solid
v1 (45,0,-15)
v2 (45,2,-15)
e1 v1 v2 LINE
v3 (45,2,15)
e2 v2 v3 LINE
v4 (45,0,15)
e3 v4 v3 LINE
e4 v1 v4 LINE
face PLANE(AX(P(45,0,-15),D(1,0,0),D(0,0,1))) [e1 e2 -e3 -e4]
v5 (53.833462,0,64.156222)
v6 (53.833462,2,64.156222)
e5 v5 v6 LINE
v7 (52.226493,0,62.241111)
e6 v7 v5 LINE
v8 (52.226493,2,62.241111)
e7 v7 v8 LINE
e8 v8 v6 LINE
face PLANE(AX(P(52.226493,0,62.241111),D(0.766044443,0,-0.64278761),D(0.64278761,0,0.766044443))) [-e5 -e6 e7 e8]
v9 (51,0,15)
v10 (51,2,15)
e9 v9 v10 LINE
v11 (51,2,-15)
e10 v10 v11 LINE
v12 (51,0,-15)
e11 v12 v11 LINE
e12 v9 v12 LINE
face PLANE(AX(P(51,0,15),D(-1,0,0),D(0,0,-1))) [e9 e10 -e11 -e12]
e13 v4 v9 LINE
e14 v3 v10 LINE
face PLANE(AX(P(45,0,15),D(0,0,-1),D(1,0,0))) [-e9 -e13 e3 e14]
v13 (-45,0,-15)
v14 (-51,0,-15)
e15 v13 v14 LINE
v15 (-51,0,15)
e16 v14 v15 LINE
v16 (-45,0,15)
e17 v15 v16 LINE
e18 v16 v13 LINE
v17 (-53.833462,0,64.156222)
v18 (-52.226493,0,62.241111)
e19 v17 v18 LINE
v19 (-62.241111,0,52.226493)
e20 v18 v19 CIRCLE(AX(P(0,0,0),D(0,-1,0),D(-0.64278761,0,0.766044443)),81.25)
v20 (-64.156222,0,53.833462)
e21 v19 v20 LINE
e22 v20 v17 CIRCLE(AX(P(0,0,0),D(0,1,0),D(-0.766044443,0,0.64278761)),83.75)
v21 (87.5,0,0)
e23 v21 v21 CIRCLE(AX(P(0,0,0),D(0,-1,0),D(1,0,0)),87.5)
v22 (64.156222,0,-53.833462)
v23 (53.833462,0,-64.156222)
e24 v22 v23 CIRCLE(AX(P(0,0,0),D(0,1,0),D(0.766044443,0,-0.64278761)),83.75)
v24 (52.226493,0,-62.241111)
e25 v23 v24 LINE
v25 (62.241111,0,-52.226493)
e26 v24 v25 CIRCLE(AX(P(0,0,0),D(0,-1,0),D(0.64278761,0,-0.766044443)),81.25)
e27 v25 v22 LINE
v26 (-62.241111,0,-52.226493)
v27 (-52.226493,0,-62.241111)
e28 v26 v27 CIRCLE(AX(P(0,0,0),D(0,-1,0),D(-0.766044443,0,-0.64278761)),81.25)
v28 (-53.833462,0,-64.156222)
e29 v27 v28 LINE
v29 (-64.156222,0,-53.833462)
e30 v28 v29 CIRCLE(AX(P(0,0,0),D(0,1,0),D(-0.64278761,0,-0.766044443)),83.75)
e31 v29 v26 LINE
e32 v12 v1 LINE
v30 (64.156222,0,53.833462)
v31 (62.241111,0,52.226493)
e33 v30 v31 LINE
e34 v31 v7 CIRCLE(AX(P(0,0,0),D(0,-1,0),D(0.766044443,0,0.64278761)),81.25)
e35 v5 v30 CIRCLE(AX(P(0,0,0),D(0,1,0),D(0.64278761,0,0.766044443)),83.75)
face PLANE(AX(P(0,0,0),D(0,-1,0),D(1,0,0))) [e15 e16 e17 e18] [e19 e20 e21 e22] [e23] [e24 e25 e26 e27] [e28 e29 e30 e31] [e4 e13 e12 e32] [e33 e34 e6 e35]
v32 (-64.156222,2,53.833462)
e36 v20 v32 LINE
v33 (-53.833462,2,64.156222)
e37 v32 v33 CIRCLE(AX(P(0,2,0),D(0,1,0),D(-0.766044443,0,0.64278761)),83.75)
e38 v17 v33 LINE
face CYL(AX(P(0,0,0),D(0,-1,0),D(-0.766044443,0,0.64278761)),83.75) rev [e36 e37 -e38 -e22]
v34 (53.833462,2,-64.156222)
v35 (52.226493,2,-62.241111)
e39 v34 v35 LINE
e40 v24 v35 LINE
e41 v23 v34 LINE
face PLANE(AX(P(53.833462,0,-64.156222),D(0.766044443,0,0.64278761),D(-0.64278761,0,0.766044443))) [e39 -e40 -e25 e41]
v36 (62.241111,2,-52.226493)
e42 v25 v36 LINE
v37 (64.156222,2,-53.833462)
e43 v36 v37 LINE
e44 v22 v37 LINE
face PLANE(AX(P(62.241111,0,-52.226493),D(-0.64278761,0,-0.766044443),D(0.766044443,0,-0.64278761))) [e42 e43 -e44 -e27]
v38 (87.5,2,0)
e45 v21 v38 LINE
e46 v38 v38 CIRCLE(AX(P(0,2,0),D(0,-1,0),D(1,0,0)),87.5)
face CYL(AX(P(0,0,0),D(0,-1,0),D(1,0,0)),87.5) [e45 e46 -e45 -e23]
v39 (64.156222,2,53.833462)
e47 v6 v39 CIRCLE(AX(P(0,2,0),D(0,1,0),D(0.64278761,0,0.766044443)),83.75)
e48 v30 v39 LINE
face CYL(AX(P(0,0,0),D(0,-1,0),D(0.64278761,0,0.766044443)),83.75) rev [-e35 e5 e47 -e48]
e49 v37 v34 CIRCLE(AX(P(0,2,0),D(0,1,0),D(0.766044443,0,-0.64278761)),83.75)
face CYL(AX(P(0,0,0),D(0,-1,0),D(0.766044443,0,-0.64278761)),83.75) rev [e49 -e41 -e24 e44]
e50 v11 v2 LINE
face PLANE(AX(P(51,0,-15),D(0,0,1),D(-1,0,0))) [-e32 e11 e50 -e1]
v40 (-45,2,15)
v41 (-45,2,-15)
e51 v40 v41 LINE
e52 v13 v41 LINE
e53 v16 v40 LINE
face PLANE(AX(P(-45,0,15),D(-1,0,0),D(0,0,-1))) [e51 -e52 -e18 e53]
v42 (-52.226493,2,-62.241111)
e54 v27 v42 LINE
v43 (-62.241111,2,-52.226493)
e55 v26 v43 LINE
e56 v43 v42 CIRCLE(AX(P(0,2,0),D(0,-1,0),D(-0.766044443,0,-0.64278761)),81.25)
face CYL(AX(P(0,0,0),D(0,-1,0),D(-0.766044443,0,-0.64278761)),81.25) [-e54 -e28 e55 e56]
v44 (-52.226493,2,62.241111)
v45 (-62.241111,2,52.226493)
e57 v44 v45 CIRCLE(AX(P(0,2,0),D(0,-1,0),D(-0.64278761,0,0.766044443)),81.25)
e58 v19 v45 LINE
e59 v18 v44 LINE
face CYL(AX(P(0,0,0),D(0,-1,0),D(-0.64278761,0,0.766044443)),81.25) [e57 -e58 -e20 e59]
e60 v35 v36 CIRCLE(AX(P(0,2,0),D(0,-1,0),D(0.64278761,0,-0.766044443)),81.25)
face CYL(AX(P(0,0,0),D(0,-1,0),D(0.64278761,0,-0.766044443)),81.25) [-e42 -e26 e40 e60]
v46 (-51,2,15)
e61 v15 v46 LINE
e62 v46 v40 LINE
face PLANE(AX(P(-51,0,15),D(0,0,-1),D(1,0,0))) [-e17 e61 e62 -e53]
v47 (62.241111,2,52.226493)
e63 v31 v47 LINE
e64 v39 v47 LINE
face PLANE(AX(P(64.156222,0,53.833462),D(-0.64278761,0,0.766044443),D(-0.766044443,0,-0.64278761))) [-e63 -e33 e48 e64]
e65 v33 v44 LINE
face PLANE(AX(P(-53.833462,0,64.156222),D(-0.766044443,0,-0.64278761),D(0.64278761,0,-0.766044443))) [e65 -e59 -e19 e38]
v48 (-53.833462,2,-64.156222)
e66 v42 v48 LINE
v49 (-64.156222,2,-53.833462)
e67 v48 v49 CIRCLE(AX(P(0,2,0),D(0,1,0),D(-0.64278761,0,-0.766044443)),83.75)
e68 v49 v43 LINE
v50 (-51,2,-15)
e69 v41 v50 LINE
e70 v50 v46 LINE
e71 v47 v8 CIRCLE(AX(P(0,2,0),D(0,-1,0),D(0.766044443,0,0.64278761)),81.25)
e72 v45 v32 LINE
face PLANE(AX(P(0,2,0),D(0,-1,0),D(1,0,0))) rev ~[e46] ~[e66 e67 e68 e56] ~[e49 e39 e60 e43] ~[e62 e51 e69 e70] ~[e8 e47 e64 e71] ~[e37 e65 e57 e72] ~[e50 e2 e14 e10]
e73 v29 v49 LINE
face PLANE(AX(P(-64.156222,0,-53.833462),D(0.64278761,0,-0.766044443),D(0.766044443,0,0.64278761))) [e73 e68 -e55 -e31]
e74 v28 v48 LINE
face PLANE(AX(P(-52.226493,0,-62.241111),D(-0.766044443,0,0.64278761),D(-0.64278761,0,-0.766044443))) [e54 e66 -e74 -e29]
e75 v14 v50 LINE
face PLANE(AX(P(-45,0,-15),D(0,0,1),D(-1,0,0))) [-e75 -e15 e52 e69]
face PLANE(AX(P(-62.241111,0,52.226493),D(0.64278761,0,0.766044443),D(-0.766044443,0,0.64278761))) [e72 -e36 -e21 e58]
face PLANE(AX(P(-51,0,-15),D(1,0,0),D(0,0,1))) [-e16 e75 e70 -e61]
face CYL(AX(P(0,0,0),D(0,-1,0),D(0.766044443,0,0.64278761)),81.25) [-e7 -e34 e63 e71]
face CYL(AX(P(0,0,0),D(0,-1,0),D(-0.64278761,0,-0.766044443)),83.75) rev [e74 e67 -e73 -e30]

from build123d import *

# Parameters (mm, degrees)
F0_R     = 87.5
F1_DEPTH = 2


# Not quite as in the source:
# - a feature of the source that left no trace in its solid (it failed there, or was rolled back) is left out


with BuildPart() as f1:
    # F0 (on Front) → F1 (new body)
    with BuildSketch(Plane.XZ):
        Circle(F0_R)
        with BuildLine():
            ThreePointArc((-53.8334623112, -64.1562221112), (-59.2201929244, -59.2201929244), (-64.1562221112, -53.8334623112))
            Line((-64.1562221112, -53.8334623112), (-62.2411110034, -52.226493287))
            ThreePointArc((-62.2411110034, -52.226493287), (-57.4524259714, -57.4524259714), (-52.226493287, -62.2411110034))
            Line((-52.226493287, -62.2411110034), (-53.8334623112, -64.1562221112))
        make_face(mode=Mode.SUBTRACT)
        with BuildLine():
            Line((53.8334623112, -64.1562221112), (52.226493287, -62.2411110034))
            ThreePointArc((52.226493287, -62.2411110034), (57.4524259714, -57.4524259714), (62.2411110034, -52.226493287))
            Line((62.2411110034, -52.226493287), (64.1562221112, -53.8334623112))
            ThreePointArc((64.1562221112, -53.8334623112), (59.2201929244, -59.2201929244), (53.8334623112, -64.1562221112))
        make_face(mode=Mode.SUBTRACT)
        Polygon((-45, 15), (-45, 0), (-45, -15), (-51, -15), (-51, 15), align=None, mode=Mode.SUBTRACT)
        with BuildLine():
            ThreePointArc((-64.1562221112, 53.8334623112), (-59.2201929244, 59.2201929244), (-53.8334623112, 64.1562221112))
            Line((-53.8334623112, 64.1562221112), (-52.226493287, 62.2411110034))
            ThreePointArc((-52.226493287, 62.2411110034), (-57.4524259714, 57.4524259714), (-62.2411110034, 52.226493287))
            Line((-62.2411110034, 52.226493287), (-64.1562221112, 53.8334623112))
        make_face(mode=Mode.SUBTRACT)
        Polygon((51, 15), (51, -15), (45, -15), (45, 0), (45, 15), align=None, mode=Mode.SUBTRACT)
        with BuildLine():
            ThreePointArc((53.8334623112, 64.1562221112), (59.2201929244, 59.2201929244), (64.1562221112, 53.8334623112))
            Line((64.1562221112, 53.8334623112), (62.2411110034, 52.226493287))
            ThreePointArc((62.2411110034, 52.226493287), (57.4524259714, 57.4524259714), (52.226493287, 62.2411110034))
            Line((52.226493287, 62.2411110034), (53.8334623112, 64.1562221112))
        make_face(mode=Mode.SUBTRACT)
    extrude(amount=-F1_DEPTH)


solid = f1.part
